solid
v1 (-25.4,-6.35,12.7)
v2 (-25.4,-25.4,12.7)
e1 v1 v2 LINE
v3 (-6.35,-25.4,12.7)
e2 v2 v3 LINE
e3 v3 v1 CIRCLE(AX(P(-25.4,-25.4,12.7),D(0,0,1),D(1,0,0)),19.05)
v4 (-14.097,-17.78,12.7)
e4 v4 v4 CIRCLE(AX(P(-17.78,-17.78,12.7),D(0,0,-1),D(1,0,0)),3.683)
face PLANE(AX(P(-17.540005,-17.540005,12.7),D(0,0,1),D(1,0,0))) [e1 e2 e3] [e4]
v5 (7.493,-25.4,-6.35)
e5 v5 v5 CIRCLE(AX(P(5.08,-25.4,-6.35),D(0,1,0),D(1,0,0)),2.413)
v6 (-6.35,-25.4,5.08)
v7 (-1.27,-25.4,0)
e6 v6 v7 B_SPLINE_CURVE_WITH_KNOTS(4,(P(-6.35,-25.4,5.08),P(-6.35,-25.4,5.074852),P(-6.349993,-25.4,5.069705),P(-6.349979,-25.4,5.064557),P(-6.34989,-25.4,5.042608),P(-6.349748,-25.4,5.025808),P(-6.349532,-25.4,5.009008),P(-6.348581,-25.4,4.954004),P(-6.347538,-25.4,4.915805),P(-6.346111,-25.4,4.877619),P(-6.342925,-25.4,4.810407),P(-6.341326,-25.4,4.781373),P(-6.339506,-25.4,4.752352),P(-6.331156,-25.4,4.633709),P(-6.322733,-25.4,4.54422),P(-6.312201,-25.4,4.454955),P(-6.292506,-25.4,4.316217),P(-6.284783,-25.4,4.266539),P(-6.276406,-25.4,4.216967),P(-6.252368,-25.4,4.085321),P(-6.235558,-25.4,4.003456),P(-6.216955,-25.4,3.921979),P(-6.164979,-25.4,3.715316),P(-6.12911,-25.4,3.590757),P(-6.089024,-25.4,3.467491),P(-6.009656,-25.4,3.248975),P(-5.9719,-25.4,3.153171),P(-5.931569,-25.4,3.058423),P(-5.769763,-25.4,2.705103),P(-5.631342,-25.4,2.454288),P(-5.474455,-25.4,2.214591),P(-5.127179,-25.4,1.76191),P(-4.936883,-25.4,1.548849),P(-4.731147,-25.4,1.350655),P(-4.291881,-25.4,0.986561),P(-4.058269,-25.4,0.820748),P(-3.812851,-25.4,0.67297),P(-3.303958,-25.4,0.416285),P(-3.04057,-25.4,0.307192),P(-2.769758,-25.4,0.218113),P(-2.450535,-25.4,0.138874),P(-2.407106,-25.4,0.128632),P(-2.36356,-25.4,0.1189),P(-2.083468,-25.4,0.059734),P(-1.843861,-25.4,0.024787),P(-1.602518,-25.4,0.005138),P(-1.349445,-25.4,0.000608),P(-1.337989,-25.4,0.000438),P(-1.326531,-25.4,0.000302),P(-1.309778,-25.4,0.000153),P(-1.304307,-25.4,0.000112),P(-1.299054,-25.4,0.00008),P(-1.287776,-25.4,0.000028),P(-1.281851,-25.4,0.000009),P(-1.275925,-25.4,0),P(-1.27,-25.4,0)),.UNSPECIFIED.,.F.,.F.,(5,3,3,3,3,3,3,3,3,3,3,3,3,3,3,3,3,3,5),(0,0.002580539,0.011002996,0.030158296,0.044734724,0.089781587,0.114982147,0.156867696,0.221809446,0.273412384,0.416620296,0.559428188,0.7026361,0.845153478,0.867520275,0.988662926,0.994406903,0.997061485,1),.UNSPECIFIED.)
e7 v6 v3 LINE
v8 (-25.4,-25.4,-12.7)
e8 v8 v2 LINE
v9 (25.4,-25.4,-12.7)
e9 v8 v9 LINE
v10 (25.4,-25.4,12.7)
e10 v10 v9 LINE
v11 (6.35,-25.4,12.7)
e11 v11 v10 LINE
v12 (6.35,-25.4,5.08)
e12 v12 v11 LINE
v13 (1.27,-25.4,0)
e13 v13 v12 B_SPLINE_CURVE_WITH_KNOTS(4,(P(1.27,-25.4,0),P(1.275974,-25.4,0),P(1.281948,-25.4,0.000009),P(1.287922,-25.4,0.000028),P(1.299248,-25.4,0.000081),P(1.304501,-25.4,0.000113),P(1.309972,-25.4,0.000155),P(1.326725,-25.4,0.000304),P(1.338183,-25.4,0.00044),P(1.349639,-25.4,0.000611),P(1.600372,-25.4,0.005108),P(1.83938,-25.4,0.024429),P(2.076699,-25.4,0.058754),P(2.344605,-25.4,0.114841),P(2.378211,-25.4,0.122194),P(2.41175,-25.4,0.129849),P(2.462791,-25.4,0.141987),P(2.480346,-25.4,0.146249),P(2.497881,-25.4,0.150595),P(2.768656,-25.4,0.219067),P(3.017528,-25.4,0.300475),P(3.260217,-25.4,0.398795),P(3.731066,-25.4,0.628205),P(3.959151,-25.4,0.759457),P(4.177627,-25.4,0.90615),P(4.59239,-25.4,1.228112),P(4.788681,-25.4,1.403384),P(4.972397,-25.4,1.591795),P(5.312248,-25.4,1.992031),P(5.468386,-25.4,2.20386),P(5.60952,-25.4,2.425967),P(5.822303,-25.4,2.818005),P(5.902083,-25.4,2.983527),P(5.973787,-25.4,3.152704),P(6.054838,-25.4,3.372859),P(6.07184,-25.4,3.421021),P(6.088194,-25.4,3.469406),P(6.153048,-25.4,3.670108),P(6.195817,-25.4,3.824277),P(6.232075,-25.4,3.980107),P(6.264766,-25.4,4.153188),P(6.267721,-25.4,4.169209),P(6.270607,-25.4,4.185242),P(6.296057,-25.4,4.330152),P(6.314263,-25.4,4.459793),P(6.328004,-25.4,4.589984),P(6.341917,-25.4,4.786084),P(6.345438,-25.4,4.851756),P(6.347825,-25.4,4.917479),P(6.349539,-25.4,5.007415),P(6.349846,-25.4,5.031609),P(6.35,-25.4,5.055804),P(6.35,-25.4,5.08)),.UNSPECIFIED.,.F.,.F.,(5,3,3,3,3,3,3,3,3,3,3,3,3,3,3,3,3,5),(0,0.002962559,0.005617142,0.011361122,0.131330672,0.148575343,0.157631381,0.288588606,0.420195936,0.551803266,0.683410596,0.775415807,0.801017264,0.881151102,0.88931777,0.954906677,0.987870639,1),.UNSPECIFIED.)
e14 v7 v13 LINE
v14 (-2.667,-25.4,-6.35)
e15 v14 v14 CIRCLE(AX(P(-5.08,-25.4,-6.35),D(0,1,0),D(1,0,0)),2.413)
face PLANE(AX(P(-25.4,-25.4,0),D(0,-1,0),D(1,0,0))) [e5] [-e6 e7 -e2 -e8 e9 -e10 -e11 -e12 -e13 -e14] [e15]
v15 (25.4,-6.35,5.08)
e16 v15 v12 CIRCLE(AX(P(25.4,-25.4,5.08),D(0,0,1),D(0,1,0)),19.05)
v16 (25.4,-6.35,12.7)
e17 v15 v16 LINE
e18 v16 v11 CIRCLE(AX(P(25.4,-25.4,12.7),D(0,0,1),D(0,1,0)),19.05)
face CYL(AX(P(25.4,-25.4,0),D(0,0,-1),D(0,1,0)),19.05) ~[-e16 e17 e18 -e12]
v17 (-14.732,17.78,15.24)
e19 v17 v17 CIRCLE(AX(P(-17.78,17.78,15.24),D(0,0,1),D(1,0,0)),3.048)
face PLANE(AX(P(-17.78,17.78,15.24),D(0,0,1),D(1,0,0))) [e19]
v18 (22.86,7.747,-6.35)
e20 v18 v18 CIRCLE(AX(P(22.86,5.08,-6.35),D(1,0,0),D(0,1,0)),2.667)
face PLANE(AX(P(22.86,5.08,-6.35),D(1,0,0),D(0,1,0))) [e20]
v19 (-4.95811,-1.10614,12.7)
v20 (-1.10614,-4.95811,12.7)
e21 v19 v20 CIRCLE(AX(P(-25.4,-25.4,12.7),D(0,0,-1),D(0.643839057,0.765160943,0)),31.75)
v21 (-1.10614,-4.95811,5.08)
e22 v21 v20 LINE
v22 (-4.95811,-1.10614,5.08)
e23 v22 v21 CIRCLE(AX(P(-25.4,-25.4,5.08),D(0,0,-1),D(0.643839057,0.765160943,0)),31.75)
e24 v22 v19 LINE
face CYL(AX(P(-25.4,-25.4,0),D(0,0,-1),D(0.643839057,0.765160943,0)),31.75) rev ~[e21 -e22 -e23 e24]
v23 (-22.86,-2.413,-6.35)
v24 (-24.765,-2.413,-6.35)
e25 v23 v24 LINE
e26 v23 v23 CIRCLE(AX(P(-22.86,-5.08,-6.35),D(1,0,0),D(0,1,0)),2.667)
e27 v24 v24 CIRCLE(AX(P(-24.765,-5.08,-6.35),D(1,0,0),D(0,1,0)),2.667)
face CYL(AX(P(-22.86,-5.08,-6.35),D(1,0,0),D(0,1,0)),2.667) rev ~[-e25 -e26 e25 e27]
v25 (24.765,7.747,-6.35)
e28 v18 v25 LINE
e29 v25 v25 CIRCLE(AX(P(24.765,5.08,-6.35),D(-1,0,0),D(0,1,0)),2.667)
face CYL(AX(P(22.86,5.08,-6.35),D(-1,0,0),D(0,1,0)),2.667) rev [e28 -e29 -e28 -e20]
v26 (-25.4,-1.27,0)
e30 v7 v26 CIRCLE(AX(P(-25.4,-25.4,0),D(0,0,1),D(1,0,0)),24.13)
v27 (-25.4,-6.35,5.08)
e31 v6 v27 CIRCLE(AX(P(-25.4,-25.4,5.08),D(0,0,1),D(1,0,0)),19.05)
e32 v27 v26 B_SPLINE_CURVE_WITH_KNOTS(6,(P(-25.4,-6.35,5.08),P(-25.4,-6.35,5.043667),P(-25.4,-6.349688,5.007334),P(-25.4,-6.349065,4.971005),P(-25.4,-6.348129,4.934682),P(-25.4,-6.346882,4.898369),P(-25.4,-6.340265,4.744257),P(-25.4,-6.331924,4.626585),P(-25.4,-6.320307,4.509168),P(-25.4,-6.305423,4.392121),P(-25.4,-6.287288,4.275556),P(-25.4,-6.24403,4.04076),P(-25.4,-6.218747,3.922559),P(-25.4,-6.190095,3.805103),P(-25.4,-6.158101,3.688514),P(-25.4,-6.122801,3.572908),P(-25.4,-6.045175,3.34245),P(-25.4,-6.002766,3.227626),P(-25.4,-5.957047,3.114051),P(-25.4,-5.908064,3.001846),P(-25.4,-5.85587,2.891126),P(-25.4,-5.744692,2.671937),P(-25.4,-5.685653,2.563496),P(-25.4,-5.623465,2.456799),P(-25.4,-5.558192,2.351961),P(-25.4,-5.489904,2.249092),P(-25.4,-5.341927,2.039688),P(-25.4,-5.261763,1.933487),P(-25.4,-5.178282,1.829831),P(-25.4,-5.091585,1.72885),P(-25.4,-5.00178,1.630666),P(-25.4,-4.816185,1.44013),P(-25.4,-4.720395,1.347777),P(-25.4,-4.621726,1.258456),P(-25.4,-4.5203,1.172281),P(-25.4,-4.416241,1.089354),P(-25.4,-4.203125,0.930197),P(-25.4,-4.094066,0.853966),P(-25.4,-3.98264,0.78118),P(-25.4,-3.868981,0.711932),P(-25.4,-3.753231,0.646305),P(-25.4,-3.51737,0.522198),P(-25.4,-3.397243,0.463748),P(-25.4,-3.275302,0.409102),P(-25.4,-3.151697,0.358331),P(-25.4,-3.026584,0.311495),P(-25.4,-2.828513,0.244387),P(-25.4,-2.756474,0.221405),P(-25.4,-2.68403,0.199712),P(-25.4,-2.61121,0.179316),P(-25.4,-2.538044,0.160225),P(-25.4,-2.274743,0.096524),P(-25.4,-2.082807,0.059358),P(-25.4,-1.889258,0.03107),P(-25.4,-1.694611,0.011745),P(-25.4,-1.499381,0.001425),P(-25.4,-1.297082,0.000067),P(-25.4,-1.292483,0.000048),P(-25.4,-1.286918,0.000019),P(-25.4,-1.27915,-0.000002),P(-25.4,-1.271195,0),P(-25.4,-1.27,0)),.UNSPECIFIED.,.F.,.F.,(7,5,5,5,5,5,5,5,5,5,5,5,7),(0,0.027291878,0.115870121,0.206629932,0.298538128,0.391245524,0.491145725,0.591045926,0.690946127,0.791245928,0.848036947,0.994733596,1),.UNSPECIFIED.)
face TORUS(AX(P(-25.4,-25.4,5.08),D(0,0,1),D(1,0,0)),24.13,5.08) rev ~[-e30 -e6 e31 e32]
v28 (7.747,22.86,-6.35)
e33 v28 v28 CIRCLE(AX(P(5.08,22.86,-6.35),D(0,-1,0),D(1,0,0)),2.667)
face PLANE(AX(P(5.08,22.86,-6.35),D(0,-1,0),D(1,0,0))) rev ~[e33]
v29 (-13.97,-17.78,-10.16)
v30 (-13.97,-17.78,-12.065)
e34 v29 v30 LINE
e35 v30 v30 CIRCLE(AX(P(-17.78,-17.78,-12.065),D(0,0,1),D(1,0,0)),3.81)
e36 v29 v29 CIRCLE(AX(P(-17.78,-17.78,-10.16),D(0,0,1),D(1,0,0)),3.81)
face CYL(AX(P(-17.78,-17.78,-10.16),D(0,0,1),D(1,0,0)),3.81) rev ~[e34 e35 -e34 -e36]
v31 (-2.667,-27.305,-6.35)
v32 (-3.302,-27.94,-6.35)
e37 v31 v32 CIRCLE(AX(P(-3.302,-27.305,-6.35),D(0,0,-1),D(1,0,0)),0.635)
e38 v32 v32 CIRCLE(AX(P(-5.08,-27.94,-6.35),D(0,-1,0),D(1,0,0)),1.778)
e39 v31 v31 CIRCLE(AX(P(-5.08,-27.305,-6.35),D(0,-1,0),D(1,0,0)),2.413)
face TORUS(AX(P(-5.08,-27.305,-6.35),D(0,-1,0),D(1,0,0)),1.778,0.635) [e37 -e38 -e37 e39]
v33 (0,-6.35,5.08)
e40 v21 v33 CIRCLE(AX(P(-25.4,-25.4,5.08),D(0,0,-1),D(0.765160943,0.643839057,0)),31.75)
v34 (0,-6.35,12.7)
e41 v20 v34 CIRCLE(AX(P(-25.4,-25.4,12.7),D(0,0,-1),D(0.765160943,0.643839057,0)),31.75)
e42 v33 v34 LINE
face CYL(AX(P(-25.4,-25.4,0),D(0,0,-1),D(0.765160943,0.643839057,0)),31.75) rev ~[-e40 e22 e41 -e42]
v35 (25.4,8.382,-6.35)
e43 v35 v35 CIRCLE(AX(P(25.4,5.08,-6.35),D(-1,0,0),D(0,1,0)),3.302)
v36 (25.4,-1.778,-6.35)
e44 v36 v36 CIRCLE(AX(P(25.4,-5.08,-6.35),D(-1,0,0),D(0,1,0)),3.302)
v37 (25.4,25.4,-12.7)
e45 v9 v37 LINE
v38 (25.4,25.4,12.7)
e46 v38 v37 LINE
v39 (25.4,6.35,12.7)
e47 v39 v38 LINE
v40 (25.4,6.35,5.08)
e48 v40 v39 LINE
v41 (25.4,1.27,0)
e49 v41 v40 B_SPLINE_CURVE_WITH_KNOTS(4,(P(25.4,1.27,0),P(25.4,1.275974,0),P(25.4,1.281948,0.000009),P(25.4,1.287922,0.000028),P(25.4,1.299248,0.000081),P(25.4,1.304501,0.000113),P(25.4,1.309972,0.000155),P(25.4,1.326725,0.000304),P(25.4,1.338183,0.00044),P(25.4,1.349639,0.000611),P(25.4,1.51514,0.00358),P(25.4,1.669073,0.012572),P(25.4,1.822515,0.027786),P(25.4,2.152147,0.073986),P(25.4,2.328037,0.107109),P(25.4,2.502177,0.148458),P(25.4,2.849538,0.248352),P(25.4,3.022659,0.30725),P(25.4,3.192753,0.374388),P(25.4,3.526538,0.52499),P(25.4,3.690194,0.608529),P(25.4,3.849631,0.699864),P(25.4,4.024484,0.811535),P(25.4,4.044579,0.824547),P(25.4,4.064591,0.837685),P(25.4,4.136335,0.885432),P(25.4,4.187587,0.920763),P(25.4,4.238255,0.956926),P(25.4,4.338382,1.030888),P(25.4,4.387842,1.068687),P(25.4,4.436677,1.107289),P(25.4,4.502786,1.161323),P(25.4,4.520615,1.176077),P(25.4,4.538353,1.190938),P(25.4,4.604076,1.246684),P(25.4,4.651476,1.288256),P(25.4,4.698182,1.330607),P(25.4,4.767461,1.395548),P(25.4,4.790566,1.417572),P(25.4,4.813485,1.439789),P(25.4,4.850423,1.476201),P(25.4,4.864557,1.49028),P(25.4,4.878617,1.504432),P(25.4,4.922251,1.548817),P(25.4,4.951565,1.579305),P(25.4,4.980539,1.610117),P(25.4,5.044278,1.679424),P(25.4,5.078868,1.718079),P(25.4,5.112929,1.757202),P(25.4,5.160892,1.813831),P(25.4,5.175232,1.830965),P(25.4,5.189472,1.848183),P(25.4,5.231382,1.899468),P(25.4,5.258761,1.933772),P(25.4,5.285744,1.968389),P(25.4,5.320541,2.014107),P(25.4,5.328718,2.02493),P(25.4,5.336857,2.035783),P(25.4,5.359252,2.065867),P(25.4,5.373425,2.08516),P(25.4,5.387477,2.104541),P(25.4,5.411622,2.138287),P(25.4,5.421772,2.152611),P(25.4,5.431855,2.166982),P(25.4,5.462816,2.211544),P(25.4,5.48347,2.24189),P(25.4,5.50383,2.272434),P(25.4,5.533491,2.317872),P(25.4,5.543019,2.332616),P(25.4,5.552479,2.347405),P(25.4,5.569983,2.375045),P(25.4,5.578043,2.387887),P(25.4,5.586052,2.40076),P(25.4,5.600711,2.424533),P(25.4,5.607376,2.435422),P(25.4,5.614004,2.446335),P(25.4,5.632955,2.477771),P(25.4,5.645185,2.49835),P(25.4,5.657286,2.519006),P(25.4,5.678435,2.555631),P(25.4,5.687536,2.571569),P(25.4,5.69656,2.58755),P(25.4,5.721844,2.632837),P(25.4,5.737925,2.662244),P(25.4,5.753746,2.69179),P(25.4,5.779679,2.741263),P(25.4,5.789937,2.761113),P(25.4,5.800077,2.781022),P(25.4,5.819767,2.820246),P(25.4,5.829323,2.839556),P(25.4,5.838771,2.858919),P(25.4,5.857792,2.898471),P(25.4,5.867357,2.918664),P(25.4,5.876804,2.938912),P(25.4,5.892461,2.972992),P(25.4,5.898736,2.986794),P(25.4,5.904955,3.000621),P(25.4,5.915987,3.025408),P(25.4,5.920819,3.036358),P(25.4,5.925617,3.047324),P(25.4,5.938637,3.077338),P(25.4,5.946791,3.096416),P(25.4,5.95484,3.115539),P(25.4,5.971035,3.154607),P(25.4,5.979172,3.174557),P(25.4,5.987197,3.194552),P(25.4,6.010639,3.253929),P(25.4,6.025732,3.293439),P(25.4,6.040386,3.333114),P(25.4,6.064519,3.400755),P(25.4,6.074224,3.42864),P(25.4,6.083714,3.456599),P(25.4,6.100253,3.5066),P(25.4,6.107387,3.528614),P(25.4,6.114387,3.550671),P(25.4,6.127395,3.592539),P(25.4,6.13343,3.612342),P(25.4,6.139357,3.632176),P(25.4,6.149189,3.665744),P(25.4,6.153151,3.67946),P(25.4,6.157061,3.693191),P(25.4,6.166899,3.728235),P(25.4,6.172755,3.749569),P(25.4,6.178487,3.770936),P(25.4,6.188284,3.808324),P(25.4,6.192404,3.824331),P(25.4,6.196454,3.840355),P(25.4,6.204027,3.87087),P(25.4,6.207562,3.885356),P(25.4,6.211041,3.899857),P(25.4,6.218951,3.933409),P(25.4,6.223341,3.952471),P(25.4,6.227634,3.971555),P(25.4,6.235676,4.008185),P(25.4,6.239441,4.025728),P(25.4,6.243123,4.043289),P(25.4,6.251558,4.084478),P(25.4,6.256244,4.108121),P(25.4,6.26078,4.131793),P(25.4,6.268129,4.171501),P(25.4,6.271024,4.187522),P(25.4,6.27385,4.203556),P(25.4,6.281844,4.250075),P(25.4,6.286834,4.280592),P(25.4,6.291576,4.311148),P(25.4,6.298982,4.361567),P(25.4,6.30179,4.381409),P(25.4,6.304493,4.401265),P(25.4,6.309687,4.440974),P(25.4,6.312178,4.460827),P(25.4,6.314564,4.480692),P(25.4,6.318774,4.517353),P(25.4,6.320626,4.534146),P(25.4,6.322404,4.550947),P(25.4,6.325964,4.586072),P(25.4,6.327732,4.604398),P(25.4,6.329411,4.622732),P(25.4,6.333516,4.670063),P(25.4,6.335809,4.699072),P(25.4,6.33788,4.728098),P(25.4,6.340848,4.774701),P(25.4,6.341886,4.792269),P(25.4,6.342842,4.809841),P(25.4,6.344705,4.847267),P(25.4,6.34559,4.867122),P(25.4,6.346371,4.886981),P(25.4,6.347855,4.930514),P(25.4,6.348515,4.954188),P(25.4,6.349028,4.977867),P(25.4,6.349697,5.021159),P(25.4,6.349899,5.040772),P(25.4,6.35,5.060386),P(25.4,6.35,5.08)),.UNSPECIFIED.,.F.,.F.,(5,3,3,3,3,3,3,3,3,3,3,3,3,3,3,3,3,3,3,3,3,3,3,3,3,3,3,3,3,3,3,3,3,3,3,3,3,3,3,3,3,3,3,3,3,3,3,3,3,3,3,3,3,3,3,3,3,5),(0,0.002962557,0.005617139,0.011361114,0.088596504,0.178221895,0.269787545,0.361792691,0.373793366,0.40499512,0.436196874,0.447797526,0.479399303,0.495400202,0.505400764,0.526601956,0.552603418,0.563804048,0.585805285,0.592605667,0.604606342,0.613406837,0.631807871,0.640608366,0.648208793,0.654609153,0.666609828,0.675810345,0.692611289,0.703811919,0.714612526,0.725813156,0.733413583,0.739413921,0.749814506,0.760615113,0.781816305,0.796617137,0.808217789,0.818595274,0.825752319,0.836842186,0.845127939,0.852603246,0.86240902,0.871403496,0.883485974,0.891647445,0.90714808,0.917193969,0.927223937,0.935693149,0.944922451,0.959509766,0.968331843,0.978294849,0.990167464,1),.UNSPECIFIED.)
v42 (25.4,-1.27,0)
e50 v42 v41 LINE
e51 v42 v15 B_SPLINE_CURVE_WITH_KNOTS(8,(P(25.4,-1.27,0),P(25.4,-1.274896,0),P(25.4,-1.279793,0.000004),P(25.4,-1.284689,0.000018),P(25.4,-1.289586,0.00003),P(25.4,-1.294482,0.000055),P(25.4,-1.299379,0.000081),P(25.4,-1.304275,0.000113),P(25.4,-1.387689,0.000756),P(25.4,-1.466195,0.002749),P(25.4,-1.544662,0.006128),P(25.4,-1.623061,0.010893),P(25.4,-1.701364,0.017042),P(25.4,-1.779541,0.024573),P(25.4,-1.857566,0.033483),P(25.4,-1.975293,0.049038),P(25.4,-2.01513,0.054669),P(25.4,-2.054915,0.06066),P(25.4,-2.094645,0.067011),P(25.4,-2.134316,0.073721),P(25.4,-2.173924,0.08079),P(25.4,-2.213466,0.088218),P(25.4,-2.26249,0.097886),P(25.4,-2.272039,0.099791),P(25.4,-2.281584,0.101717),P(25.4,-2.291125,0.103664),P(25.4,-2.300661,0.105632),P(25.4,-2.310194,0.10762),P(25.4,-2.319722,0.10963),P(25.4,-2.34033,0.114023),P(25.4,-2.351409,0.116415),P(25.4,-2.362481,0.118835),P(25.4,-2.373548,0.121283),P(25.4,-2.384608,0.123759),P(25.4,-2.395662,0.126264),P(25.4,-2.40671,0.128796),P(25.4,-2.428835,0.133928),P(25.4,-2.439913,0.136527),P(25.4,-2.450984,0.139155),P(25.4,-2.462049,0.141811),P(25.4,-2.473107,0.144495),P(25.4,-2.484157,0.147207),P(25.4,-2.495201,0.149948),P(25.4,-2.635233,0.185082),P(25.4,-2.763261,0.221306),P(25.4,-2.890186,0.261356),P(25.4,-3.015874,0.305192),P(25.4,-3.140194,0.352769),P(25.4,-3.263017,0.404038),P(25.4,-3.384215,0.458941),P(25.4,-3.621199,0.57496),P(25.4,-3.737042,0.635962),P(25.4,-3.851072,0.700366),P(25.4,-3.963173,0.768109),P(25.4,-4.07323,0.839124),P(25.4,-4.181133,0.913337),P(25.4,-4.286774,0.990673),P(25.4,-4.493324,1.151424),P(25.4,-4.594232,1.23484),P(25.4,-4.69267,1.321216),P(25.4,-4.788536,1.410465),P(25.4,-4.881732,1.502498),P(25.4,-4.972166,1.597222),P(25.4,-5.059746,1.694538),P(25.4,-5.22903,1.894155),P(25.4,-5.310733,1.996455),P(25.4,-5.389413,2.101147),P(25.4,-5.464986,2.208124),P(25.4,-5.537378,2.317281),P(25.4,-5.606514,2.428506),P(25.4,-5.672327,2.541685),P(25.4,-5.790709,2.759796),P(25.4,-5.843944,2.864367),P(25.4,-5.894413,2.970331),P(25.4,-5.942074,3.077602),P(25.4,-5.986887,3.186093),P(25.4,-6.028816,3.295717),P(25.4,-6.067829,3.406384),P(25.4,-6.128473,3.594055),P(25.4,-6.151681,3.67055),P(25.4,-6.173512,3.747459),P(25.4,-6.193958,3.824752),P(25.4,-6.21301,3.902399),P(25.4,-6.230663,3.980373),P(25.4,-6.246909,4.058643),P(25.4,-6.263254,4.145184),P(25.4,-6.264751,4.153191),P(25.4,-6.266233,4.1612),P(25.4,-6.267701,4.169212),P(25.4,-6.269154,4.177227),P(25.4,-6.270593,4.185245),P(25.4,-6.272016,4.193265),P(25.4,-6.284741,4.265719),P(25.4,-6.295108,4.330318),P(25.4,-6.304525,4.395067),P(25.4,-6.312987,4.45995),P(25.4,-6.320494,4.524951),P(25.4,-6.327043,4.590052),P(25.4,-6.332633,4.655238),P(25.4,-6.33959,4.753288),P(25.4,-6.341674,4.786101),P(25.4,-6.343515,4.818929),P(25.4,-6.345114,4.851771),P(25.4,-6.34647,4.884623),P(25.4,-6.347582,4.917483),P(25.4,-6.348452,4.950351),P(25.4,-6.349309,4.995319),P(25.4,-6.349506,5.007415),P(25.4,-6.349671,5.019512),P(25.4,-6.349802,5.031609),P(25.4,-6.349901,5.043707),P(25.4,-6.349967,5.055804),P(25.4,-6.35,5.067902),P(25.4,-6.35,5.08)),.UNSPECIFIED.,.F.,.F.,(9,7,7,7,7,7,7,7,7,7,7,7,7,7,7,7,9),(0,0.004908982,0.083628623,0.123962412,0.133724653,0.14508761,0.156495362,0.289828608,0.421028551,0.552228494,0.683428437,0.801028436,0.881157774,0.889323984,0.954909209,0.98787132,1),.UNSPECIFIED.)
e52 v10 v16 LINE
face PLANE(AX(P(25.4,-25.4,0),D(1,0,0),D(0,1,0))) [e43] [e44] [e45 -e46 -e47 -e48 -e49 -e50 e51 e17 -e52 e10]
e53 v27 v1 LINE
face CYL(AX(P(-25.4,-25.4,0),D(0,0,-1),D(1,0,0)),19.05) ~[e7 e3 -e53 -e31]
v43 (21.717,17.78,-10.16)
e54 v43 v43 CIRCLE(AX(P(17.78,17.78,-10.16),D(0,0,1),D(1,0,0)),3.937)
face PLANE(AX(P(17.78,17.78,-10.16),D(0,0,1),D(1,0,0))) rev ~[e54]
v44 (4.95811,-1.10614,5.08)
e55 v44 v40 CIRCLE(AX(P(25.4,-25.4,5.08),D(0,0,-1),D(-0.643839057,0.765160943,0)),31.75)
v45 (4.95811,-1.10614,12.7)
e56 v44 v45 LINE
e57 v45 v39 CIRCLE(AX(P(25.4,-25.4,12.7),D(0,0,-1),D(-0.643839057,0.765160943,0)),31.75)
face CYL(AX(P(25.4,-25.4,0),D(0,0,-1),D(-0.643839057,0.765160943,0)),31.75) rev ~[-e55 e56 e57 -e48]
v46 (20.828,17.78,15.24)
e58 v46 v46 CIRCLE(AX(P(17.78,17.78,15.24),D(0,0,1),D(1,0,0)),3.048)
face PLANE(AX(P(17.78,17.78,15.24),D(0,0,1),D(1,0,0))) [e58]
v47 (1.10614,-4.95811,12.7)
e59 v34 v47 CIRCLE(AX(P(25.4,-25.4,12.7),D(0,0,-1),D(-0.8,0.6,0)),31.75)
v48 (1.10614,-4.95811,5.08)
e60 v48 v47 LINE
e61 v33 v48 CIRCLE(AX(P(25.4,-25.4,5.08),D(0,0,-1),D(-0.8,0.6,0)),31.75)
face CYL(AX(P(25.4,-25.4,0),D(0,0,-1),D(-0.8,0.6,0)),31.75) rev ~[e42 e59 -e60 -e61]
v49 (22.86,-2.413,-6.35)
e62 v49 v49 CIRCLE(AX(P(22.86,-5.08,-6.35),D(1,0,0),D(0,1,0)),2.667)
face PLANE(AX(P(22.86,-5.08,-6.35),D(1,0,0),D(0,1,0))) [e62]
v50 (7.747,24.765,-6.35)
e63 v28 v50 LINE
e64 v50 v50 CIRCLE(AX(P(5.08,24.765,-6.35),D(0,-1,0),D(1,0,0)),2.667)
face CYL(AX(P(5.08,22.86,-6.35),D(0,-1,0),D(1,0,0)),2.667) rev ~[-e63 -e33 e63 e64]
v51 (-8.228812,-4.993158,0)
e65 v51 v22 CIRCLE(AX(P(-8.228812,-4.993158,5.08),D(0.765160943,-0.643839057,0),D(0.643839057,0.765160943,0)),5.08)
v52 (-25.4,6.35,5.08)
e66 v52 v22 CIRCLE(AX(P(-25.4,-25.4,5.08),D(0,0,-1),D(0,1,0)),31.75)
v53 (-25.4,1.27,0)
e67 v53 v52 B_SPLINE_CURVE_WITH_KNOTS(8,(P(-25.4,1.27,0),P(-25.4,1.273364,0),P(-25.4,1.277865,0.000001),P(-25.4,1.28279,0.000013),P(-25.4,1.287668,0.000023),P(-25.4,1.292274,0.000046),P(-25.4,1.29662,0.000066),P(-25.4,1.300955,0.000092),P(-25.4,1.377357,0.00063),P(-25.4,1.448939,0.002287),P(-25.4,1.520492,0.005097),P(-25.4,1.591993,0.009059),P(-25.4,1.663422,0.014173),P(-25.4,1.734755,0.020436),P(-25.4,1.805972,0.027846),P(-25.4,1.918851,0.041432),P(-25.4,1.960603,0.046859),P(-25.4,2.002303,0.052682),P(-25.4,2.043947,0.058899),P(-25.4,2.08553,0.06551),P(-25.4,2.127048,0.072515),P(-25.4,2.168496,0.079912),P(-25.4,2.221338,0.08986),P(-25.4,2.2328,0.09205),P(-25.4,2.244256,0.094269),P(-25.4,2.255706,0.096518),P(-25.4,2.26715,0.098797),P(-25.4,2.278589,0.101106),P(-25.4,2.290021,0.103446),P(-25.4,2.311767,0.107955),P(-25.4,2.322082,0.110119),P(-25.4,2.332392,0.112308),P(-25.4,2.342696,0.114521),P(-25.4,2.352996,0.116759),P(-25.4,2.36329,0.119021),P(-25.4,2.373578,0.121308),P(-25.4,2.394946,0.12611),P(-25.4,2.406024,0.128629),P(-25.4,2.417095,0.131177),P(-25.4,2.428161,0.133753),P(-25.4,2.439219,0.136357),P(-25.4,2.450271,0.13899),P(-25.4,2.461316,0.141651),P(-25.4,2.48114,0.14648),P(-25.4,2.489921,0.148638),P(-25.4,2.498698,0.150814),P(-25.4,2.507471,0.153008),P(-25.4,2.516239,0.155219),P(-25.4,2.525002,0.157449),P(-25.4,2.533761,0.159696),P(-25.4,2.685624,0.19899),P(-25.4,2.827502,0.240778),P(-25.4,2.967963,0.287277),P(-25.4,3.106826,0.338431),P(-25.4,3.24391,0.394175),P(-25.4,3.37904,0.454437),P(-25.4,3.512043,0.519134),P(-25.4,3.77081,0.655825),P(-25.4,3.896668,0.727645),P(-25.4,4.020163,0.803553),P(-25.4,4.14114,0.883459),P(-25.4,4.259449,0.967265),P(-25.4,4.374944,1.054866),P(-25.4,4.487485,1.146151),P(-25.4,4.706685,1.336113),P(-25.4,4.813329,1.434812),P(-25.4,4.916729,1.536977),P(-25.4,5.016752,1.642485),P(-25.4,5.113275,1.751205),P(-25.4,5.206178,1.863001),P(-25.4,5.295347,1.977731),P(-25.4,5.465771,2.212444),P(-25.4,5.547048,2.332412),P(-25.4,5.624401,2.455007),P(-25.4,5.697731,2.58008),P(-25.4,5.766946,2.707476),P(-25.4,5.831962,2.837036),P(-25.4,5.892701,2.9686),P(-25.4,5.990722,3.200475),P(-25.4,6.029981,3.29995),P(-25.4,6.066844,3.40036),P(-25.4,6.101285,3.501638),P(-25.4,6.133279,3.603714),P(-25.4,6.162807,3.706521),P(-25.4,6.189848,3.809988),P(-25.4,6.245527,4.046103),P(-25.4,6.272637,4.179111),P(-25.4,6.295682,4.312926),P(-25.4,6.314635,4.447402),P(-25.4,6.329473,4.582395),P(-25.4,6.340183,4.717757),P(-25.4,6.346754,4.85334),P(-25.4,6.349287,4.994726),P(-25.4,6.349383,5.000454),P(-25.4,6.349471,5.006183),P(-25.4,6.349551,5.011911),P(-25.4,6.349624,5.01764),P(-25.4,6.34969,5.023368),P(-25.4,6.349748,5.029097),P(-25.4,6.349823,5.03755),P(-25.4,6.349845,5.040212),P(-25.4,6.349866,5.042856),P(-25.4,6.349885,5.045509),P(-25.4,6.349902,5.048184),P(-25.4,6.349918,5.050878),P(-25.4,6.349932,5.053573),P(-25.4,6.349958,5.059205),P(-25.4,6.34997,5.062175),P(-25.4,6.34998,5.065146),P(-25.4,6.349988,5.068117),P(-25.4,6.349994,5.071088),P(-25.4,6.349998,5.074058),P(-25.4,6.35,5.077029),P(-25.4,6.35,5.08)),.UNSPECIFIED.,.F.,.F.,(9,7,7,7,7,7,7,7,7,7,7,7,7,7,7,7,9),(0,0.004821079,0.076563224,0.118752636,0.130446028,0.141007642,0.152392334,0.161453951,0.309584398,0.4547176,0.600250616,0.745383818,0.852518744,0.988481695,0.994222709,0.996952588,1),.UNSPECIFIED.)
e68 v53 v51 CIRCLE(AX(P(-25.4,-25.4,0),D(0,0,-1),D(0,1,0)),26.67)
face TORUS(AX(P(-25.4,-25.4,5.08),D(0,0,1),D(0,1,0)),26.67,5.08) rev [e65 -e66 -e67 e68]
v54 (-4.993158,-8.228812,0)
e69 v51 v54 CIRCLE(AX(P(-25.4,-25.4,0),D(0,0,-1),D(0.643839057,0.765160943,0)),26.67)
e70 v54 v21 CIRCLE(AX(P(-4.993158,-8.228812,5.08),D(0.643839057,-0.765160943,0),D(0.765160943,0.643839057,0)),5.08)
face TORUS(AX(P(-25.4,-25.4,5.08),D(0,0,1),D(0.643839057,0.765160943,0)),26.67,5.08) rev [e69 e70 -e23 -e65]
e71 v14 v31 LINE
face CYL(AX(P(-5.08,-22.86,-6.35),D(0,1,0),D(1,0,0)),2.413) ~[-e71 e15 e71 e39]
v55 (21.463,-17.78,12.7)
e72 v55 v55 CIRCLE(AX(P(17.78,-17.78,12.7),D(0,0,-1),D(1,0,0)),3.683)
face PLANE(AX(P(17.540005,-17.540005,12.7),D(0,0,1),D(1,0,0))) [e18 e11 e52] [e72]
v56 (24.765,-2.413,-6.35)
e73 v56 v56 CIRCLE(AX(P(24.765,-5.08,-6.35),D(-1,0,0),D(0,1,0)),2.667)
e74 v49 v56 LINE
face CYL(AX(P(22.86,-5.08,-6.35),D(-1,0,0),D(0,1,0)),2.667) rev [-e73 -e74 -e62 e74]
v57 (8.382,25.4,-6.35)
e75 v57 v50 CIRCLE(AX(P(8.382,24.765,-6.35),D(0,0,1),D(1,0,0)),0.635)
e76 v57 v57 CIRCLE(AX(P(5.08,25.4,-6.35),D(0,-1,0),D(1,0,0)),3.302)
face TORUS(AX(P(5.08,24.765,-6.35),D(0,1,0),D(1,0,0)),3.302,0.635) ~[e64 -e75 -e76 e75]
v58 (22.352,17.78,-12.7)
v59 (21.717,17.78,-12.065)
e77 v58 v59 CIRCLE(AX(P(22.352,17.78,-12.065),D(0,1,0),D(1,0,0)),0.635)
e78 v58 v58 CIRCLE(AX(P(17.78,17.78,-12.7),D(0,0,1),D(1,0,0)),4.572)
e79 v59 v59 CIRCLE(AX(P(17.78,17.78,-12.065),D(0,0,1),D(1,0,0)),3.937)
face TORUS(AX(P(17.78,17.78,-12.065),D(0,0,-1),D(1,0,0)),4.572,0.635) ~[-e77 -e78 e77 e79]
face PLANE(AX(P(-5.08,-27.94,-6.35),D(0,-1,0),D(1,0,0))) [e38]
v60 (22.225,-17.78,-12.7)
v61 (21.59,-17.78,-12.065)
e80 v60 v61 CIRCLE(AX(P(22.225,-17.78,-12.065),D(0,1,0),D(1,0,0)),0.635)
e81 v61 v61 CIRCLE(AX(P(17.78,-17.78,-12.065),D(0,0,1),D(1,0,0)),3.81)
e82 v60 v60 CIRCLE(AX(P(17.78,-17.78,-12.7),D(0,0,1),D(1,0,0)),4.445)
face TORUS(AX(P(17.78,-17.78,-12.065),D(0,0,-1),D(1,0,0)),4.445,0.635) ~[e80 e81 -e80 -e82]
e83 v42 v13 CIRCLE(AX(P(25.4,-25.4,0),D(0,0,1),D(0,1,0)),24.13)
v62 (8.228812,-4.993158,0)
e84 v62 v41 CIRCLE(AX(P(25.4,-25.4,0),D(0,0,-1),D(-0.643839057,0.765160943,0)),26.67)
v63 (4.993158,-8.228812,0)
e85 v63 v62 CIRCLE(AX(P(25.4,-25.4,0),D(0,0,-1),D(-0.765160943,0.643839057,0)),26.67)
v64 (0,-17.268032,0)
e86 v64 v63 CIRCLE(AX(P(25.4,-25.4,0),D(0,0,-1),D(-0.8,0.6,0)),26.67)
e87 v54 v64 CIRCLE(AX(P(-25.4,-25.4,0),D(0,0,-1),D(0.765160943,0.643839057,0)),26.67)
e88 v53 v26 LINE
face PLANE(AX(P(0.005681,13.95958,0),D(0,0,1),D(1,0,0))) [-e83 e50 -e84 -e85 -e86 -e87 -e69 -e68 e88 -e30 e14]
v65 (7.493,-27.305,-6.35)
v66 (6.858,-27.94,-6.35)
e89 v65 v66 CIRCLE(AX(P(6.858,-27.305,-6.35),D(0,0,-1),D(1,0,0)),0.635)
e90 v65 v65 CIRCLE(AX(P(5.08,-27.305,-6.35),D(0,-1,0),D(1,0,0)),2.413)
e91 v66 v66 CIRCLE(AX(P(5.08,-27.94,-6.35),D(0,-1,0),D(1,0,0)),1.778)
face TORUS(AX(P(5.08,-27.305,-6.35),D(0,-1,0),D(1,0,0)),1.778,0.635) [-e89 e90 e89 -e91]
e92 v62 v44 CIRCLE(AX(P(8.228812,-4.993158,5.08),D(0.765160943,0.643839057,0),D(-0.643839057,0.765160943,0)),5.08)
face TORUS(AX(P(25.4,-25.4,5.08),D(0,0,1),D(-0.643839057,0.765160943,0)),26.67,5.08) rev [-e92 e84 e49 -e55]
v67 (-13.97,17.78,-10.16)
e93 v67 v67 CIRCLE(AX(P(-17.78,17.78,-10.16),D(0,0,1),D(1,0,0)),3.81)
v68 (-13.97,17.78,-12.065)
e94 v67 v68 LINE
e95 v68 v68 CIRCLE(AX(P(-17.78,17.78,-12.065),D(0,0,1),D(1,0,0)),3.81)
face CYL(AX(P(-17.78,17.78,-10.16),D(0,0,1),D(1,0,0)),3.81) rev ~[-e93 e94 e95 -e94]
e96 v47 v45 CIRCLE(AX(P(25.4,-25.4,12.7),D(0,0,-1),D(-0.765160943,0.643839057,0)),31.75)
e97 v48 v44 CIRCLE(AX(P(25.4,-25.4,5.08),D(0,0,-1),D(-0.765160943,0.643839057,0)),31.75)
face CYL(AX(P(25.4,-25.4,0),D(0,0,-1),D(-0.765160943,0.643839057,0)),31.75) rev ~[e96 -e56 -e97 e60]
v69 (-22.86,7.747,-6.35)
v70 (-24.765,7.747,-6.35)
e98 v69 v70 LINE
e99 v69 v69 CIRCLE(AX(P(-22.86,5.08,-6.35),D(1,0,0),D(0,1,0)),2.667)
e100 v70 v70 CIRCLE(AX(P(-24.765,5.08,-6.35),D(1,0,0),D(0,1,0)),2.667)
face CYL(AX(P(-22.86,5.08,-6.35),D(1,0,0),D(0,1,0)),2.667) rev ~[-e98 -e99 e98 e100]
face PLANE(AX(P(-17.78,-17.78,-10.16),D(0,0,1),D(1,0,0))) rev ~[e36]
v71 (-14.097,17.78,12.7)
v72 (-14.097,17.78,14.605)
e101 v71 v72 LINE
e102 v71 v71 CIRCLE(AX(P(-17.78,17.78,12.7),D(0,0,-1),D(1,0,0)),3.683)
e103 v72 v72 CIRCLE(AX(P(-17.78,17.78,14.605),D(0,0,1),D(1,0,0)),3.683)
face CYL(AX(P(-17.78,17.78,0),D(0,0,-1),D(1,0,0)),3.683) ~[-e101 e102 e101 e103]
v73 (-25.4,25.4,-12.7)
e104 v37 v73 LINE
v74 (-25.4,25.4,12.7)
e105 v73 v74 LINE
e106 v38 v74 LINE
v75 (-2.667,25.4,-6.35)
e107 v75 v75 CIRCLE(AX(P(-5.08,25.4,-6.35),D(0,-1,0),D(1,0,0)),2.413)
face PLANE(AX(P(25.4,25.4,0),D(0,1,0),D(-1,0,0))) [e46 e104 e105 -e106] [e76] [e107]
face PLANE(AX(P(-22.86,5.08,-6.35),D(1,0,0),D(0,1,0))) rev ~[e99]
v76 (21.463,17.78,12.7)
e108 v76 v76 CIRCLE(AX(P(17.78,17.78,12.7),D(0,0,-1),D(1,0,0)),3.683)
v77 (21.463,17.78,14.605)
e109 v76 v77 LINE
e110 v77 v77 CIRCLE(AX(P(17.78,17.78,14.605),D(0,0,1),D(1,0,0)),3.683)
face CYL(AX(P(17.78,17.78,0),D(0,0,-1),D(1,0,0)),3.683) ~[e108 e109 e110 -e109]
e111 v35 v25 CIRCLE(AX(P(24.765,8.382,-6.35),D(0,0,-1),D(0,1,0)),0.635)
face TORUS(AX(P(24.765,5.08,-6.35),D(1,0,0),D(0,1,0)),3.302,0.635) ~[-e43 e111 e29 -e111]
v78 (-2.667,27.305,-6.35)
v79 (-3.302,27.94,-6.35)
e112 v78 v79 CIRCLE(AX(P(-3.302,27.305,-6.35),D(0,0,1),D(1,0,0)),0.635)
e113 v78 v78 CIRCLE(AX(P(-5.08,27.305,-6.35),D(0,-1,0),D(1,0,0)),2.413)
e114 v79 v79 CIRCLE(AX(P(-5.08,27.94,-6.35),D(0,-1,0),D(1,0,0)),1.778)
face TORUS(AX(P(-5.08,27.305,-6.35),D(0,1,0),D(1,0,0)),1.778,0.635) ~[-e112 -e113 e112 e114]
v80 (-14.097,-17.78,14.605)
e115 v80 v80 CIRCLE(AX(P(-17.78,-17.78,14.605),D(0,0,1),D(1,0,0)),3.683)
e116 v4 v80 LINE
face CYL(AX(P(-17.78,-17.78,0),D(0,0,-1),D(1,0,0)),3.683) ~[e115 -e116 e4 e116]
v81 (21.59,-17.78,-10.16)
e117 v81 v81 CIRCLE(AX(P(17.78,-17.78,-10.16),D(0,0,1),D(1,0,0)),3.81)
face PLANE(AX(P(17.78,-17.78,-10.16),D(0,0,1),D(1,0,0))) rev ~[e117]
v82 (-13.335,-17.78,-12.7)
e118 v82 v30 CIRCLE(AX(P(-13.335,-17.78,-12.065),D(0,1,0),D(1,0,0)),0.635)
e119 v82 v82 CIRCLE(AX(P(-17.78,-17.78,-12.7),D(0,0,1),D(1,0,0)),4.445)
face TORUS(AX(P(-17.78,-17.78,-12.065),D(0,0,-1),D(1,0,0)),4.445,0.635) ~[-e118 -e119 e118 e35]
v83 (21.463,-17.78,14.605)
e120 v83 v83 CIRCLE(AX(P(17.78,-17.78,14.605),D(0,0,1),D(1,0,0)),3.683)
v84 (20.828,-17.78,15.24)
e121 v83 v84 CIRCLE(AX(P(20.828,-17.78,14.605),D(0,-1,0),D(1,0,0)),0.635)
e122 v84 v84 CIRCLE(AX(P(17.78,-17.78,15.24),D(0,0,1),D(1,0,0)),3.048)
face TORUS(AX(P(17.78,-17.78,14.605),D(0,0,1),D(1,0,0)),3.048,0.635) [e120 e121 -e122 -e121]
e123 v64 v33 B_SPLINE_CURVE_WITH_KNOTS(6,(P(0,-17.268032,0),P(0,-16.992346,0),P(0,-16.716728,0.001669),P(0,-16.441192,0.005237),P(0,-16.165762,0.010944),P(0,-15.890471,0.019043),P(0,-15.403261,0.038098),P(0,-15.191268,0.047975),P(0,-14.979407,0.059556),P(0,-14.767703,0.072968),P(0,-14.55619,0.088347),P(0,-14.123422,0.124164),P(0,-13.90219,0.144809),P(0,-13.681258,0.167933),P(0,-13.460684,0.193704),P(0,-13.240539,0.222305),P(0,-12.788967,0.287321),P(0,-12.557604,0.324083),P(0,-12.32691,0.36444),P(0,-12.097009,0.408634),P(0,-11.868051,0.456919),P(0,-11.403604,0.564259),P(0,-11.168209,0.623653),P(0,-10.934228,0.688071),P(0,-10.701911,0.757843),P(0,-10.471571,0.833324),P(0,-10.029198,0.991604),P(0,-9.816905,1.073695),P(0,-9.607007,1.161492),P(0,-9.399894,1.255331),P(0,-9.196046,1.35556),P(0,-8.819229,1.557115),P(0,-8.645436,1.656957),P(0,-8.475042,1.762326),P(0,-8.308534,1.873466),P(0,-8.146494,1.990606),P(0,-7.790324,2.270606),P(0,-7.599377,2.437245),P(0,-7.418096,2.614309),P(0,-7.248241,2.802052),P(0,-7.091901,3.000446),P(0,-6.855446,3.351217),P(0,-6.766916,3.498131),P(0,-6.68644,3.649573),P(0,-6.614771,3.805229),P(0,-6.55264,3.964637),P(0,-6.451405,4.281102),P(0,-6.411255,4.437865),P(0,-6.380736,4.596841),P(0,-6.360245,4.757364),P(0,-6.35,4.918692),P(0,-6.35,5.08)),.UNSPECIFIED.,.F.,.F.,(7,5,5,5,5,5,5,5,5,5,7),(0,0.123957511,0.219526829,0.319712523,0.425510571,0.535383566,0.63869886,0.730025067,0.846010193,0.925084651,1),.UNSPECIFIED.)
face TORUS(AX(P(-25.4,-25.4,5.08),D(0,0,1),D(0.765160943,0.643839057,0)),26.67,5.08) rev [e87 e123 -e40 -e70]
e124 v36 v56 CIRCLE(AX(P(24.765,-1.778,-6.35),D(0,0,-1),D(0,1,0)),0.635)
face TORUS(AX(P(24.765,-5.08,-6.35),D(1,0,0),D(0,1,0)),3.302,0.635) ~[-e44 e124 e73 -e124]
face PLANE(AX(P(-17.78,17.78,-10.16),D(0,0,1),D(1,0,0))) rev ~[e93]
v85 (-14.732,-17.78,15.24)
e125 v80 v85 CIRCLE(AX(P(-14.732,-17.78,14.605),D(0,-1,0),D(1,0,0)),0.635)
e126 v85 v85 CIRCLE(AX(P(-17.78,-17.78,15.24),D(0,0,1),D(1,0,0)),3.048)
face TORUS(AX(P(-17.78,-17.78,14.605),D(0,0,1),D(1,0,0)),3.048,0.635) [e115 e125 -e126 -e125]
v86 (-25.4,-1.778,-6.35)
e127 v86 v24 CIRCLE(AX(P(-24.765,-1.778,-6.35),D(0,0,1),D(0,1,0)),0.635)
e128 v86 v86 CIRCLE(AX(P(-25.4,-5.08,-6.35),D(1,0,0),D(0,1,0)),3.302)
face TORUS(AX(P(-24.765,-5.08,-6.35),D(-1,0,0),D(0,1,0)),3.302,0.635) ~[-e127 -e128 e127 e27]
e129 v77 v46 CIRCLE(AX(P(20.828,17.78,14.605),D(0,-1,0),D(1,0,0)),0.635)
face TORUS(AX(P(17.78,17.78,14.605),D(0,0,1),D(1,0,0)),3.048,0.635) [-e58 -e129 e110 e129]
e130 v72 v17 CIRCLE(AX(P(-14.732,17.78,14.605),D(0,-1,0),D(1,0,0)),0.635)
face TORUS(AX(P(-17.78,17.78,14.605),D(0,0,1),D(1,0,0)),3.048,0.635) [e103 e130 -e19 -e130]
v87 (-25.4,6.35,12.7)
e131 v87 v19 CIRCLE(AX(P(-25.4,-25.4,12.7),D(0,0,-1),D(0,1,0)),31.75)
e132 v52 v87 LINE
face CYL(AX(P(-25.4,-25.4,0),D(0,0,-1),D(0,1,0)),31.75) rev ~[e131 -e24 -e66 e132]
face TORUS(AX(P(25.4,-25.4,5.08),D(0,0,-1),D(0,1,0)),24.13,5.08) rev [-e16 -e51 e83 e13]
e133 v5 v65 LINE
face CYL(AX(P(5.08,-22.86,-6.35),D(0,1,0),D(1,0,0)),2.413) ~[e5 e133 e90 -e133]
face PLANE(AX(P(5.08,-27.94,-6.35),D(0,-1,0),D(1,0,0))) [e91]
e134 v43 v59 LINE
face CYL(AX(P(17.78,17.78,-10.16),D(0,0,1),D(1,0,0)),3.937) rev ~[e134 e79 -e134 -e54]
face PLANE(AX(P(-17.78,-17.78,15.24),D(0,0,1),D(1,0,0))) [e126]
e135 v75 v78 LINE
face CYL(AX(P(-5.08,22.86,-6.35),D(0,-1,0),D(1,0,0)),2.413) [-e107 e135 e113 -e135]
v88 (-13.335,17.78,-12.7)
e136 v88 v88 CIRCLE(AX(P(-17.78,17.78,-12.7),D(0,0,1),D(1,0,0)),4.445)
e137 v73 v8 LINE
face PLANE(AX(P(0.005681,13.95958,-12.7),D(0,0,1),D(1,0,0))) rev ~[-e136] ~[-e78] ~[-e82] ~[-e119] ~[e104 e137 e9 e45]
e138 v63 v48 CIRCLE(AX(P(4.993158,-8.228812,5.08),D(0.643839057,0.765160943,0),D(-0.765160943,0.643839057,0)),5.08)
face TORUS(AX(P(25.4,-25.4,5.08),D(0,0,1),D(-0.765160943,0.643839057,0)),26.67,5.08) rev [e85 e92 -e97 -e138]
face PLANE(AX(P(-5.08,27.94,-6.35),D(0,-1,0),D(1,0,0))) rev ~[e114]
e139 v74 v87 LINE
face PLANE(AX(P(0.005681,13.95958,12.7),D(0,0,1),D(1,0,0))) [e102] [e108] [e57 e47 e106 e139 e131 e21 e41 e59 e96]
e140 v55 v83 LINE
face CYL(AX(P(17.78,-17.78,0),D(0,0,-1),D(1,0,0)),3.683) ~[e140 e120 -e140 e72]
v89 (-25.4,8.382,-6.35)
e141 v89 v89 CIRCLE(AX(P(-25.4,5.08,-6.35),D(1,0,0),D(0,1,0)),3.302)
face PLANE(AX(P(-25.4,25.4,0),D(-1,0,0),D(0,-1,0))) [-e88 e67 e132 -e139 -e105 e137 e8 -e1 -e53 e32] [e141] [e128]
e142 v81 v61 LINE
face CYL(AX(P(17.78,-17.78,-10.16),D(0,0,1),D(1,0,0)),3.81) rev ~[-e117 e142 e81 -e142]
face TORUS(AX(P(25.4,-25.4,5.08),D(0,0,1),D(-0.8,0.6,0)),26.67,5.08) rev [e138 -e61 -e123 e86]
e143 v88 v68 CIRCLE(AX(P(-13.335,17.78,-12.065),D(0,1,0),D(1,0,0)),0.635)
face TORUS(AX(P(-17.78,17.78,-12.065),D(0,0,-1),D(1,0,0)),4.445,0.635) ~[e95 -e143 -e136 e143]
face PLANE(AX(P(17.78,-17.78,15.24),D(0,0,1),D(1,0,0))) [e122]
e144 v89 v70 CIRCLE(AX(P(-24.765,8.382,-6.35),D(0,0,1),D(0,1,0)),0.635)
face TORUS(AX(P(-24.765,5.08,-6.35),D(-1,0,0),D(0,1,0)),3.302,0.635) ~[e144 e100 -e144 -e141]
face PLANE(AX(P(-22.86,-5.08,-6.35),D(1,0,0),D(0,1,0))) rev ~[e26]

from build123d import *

# Parameters (mm, degrees)
F0_R      = 3.81
F0_R_2    = 3.937
F0_R_3    = 2.667
F0_R_4    = 3.683
F0_R_5    = 2.413
F1_DEPTH  = 12.7
F2_DEPTH  = 15.24
F3_DEPTH  = 12.7
F4_START  = -10.16
F4_DEPTH  = 2.54
F7_START  = -22.86
F6_R      = 2.413
F7_DEPTH  = 5.08
F8_START  = 22.86
F8_DEPTH  = 5.08
F9_START  = 22.86
F5_R      = 2.667
F5_R_2    = 2.413
F9_DEPTH  = 5.08
F10_START = -22.86
F10_DEPTH = 5.08
F11_START = -22.86
F6_R_2    = 2.667
F11_DEPTH = 5.08
F12_R     = 5.08
F13_R     = 0.635


# Not quite as in the source:
# - a feature names something its author has since deleted; it is built from what else it names


with BuildPart() as f1:
    # F0 (on Top) → F1 (new body)
    with BuildSketch(Plane.XY):
        with BuildLine():
            Line((25.4, 17.78), (25.4, 25.4))
            Line((25.4, 25.4), (-25.4, 25.4))
            Line((-25.4, 25.4), (-25.4, 6.35))
            ThreePointArc((-25.4, 6.35), (-14.520375766, 4.427776929), (-4.9581099388, -1.1061400612))
            ThreePointArc((-4.9581099388, -1.1061400612), (-0.5564177886, 5.0494355372), (5.08, 0))
            ThreePointArc((5.08, 0), (5.0494355372, -0.5564177886), (4.9581099388, -1.1061400612))
            ThreePointArc((4.9581099388, -1.1061400612), (14.520375766, 4.427776929), (25.4, 6.35))
            Line((25.4, 6.35), (25.4, 17.78))
        make_face()
        with Locations((-17.78, 17.78)):
            Circle(F0_R, mode=Mode.SUBTRACT)
        with Locations((17.78, 17.78)):
            Circle(F0_R_2, mode=Mode.SUBTRACT)
        with BuildLine():
            ThreePointArc((5.08, 0), (-0.5564177886, 5.0494355372), (-4.9581099388, -1.1061400612))
            ThreePointArc((-4.9581099388, -1.1061400612), (-2.9493596973, -2.9493596973), (-1.1061400612, -4.9581099388))
            ThreePointArc((-1.1061400612, -4.9581099388), (0, -5.08), (1.1061400612, -4.9581099388))
            ThreePointArc((1.1061400612, -4.9581099388), (2.9493596973, -2.9493596973), (4.9581099388, -1.1061400612))
            ThreePointArc((4.9581099388, -1.1061400612), (5.0494355372, -0.5564177886), (5.08, 0))
        make_face()
        Circle(F0_R_3, mode=Mode.SUBTRACT)
        with Locations((17.78, 17.78)):
            Circle(F0_R_2)
        with Locations((17.78, 17.78)):
            Circle(F0_R_4, mode=Mode.SUBTRACT)
        with Locations((-17.78, 17.78)):
            Circle(F0_R)
        with Locations((-17.78, 17.78)):
            Circle(F0_R_4, mode=Mode.SUBTRACT)
        with Locations((-17.78, 17.78)):
            Circle(F0_R_4)
        with Locations((17.78, 17.78)):
            Circle(F0_R_4)
        Circle(F0_R_3)
        Circle(F0_R_5, mode=Mode.SUBTRACT)
        Circle(F0_R_5)
        with BuildLine():
            ThreePointArc((1.1061400612, -4.9581099388), (0, -5.08), (-1.1061400612, -4.9581099388))
            ThreePointArc((-1.1061400612, -4.9581099388), (-0.5433254761, -5.6463109367), (0, -6.35))
            ThreePointArc((0, -6.35), (0.5433254761, -5.6463109367), (1.1061400612, -4.9581099388))
        make_face()
    extrude(amount=F1_DEPTH)

    # F0 (on Top) → F2, piece 2 (join)
    with BuildSketch(Plane.XY):
        with Locations((-17.78, 17.78)):
            Circle(F0_R_4)
        with Locations((17.78, 17.78)):
            Circle(F0_R_4)
    extrude(amount=F2_DEPTH)



with BuildPart() as f1b:
    # F0 (on Top) → F1, piece 2 (new body)
    with BuildSketch(Plane.XY):
        with BuildLine():
            ThreePointArc((-6.35, -25.4), (-11.9296158184, -11.9296158184), (-25.4, -6.35))
            Line((-25.4, -6.35), (-25.4, -25.4))
            Line((-25.4, -25.4), (-6.35, -25.4))
        make_face()
        with Locations((-17.78, -17.78)):
            Circle(F0_R, mode=Mode.SUBTRACT)
        with Locations((-17.78, -17.78)):
            Circle(F0_R)
        with Locations((-17.78, -17.78)):
            Circle(F0_R_4, mode=Mode.SUBTRACT)
        with Locations((-17.78, -17.78)):
            Circle(F0_R_4)
    extrude(amount=F1_DEPTH)

    # F0 (on Top) → F2 (join)
    with BuildSketch(Plane.XY):
        with Locations((-17.78, -17.78)):
            Circle(F0_R_4)
    extrude(amount=F2_DEPTH)


with BuildPart() as f1c:
    # F0 (on Top) → F1, piece 3 (new body)
    with BuildSketch(Plane.XY):
        with BuildLine():
            Line((25.4, -25.4), (25.4, -6.35))
            ThreePointArc((25.4, -6.35), (11.9296158184, -11.9296158184), (6.35, -25.4))
            Line((6.35, -25.4), (25.4, -25.4))
        make_face()
        with Locations((17.78, -17.78)):
            Circle(F0_R, mode=Mode.SUBTRACT)
        with Locations((17.78, -17.78)):
            Circle(F0_R)
        with Locations((17.78, -17.78)):
            Circle(F0_R_4, mode=Mode.SUBTRACT)
        with Locations((17.78, -17.78)):
            Circle(F0_R_4)
    extrude(amount=F1_DEPTH)

    # F0 (on Top) → F2, piece 3 (join)
    with BuildSketch(Plane.XY):
        with Locations((17.78, -17.78)):
            Circle(F0_R_4)
    extrude(amount=F2_DEPTH)


with BuildPart() as f1_1:
    add(f1.part)

    add(f1b.part)  # F3 merges F1b

    add(f1c.part)  # F3 merges F1c
    # F0 (on Top) → F3 (join)
    with BuildSketch(Plane.XY):
        with BuildLine():
            Line((25.4, 17.78), (25.4, 25.4))
            Line((25.4, 25.4), (-25.4, 25.4))
            Line((-25.4, 25.4), (-25.4, 6.35))
            ThreePointArc((-25.4, 6.35), (-14.520375766, 4.427776929), (-4.9581099388, -1.1061400612))
            ThreePointArc((-4.9581099388, -1.1061400612), (-0.5564177886, 5.0494355372), (5.08, 0))
            ThreePointArc((5.08, 0), (5.0494355372, -0.5564177886), (4.9581099388, -1.1061400612))
            ThreePointArc((4.9581099388, -1.1061400612), (14.520375766, 4.427776929), (25.4, 6.35))
            Line((25.4, 6.35), (25.4, 17.78))
        make_face()
        with Locations((-17.78, 17.78)):
            Circle(F0_R, mode=Mode.SUBTRACT)
        with Locations((17.78, 17.78)):
            Circle(F0_R_2, mode=Mode.SUBTRACT)
        with BuildLine():
            ThreePointArc((-4.9581099388, -1.1061400612), (-14.520375766, 4.427776929), (-25.4, 6.35))
            Line((-25.4, 6.35), (-25.4, -6.35))
            ThreePointArc((-25.4, -6.35), (-11.9296158184, -11.9296158184), (-6.35, -25.4))
            Line((-6.35, -25.4), (6.35, -25.4))
            ThreePointArc((6.35, -25.4), (11.9296158184, -11.9296158184), (25.4, -6.35))
            Line((25.4, -6.35), (25.4, 6.35))
            ThreePointArc((25.4, 6.35), (14.520375766, 4.427776929), (4.9581099388, -1.1061400612))
            ThreePointArc((4.9581099388, -1.1061400612), (3.5921024484, -3.5921024484), (1.1061400612, -4.9581099388))
            ThreePointArc((1.1061400612, -4.9581099388), (0.5433254761, -5.6463109367), (0, -6.35))
            ThreePointArc((0, -6.35), (-0.5433254761, -5.6463109367), (-1.1061400612, -4.9581099388))
            ThreePointArc((-1.1061400612, -4.9581099388), (-3.5921024484, -3.5921024484), (-4.9581099388, -1.1061400612))
        make_face()
        with BuildLine():
            ThreePointArc((-6.35, -25.4), (-11.9296158184, -11.9296158184), (-25.4, -6.35))
            Line((-25.4, -6.35), (-25.4, -25.4))
            Line((-25.4, -25.4), (-6.35, -25.4))
        make_face()
        with Locations((-17.78, -17.78)):
            Circle(F0_R, mode=Mode.SUBTRACT)
        with BuildLine():
            Line((25.4, -25.4), (25.4, -6.35))
            ThreePointArc((25.4, -6.35), (11.9296158184, -11.9296158184), (6.35, -25.4))
            Line((6.35, -25.4), (25.4, -25.4))
        make_face()
        with Locations((17.78, -17.78)):
            Circle(F0_R, mode=Mode.SUBTRACT)
        with BuildLine():
            ThreePointArc((5.08, 0), (-0.5564177886, 5.0494355372), (-4.9581099388, -1.1061400612))
            ThreePointArc((-4.9581099388, -1.1061400612), (-2.9493596973, -2.9493596973), (-1.1061400612, -4.9581099388))
            ThreePointArc((-1.1061400612, -4.9581099388), (0, -5.08), (1.1061400612, -4.9581099388))
            ThreePointArc((1.1061400612, -4.9581099388), (2.9493596973, -2.9493596973), (4.9581099388, -1.1061400612))
            ThreePointArc((4.9581099388, -1.1061400612), (5.0494355372, -0.5564177886), (5.08, 0))
        make_face()
        Circle(F0_R_3, mode=Mode.SUBTRACT)
        with Locations((17.78, 17.78)):
            Circle(F0_R_2)
        with Locations((17.78, 17.78)):
            Circle(F0_R_4, mode=Mode.SUBTRACT)
        with Locations((17.78, -17.78)):
            Circle(F0_R)
        with Locations((17.78, -17.78)):
            Circle(F0_R_4, mode=Mode.SUBTRACT)
        with Locations((-17.78, -17.78)):
            Circle(F0_R)
        with Locations((-17.78, -17.78)):
            Circle(F0_R_4, mode=Mode.SUBTRACT)
        with Locations((-17.78, 17.78)):
            Circle(F0_R)
        with Locations((-17.78, 17.78)):
            Circle(F0_R_4, mode=Mode.SUBTRACT)
        with Locations((17.78, -17.78)):
            Circle(F0_R_4)
        with Locations((-17.78, -17.78)):
            Circle(F0_R_4)
        with Locations((-17.78, 17.78)):
            Circle(F0_R_4)
        with Locations((17.78, 17.78)):
            Circle(F0_R_4)
        Circle(F0_R_3)
        Circle(F0_R_5, mode=Mode.SUBTRACT)
        Circle(F0_R_5)
        with BuildLine():
            ThreePointArc((-1.1061400612, -4.9581099388), (-2.9493596973, -2.9493596973), (-4.9581099388, -1.1061400612))
            ThreePointArc((-4.9581099388, -1.1061400612), (-3.5921024484, -3.5921024484), (-1.1061400612, -4.9581099388))
        make_face()
        with BuildLine():
            ThreePointArc((1.1061400612, -4.9581099388), (3.5921024484, -3.5921024484), (4.9581099388, -1.1061400612))
            ThreePointArc((4.9581099388, -1.1061400612), (2.9493596973, -2.9493596973), (1.1061400612, -4.9581099388))
        make_face()
        with BuildLine():
            ThreePointArc((1.1061400612, -4.9581099388), (0, -5.08), (-1.1061400612, -4.9581099388))
            ThreePointArc((-1.1061400612, -4.9581099388), (-0.5433254761, -5.6463109367), (0, -6.35))
            ThreePointArc((0, -6.35), (0.5433254761, -5.6463109367), (1.1061400612, -4.9581099388))
        make_face()
    extrude(amount=-F3_DEPTH)

    # F0 (on Top) → F4 (cut)
    with BuildSketch(Plane.XY.offset(F4_START)):
        with Locations((17.78, 17.78)):
            Circle(F0_R_2)
        with Locations((17.78, 17.78)):
            Circle(F0_R_4, mode=Mode.SUBTRACT)
        with Locations((-17.78, -17.78)):
            Circle(F0_R)
        with Locations((-17.78, -17.78)):
            Circle(F0_R_4, mode=Mode.SUBTRACT)
        with Locations((17.78, -17.78)):
            Circle(F0_R)
        with Locations((17.78, -17.78)):
            Circle(F0_R_4, mode=Mode.SUBTRACT)
        with Locations((-17.78, 17.78)):
            Circle(F0_R)
        with Locations((-17.78, 17.78)):
            Circle(F0_R_4, mode=Mode.SUBTRACT)
        with Locations((17.78, -17.78)):
            Circle(F0_R_4)
        with Locations((-17.78, -17.78)):
            Circle(F0_R_4)
        with Locations((17.78, 17.78)):
            Circle(F0_R_4)
        with Locations((-17.78, 17.78)):
            Circle(F0_R_4)
    extrude(amount=-F4_DEPTH, mode=Mode.SUBTRACT)

    # F6 (on Front) → F7 (join)
    with BuildSketch(Plane.XZ.offset(F7_START)):
        with Locations((-5.08, -6.35)):
            Circle(F6_R)
    extrude(amount=-F7_DEPTH)

    # F6 (on Front) → F8 (join)
    with BuildSketch(Plane.XZ.offset(F8_START)):
        with Locations((-5.08, -6.35)):
            Circle(F6_R)
        with Locations((5.08, -6.35)):
            Circle(F6_R)
    extrude(amount=F8_DEPTH)

    # F5 (on Right) → F9 (cut)
    with BuildSketch(Plane.YZ.offset(F9_START)):
        with Locations((-5.08, -6.35)):
            Circle(F5_R)
        with Locations((-5.08, -6.35)):
            Circle(F5_R_2, mode=Mode.SUBTRACT)
        with Locations((5.08, -6.35)):
            Circle(F5_R)
        with Locations((5.08, -6.35)):
            Circle(F5_R_2, mode=Mode.SUBTRACT)
        with Locations((-5.08, -6.35)):
            Circle(F5_R_2)
        with Locations((5.08, -6.35)):
            Circle(F5_R_2)
    extrude(amount=F9_DEPTH, mode=Mode.SUBTRACT)

    # F5 (on Right) → F10 (cut)
    with BuildSketch(Plane.YZ.offset(F10_START)):
        with Locations((-5.08, -6.35)):
            Circle(F5_R)
        with Locations((-5.08, -6.35)):
            Circle(F5_R_2, mode=Mode.SUBTRACT)
        with Locations((5.08, -6.35)):
            Circle(F5_R)
        with Locations((5.08, -6.35)):
            Circle(F5_R_2, mode=Mode.SUBTRACT)
        with Locations((-5.08, -6.35)):
            Circle(F5_R_2)
        with Locations((5.08, -6.35)):
            Circle(F5_R_2)
    extrude(amount=-F10_DEPTH, mode=Mode.SUBTRACT)

    # F6 (on Front) → F11 (cut)
    with BuildSketch(Plane.XZ.offset(F11_START)):
        with Locations((5.08, -6.35)):
            Circle(F6_R_2)
        with Locations((5.08, -6.35)):
            Circle(F6_R, mode=Mode.SUBTRACT)
        with Locations((5.08, -6.35)):
            Circle(F6_R)
    extrude(amount=-F11_DEPTH, mode=Mode.SUBTRACT)

    # F12
    f12_edges = [f1_1.edges().sort_by_distance(p)[0] for p in [
        (11.929616, -11.929616, 0),
        (-11.929616, -11.929616, 0),
        (-11.200968, 2.998063, 0),
        (11.200968, 2.998063, 0),
    ]]
    fillet(f12_edges, radius=F12_R)

    # F13
    f13_edges = [f1_1.edges().sort_by_distance(p)[0] for p in [
        (14.097, -17.78, 15.24),
        (-21.463, -17.78, 15.24),
        (-21.463, 17.78, 15.24),
        (14.097, 17.78, 15.24),
        (-7.493, 27.94, -6.35),
        (-25.4, -7.747, -6.35),
        (-25.4, 2.413, -6.35),
        (2.667, -27.94, -6.35),
        (-7.493, -27.94, -6.35),
        (25.4, -7.747, -6.35),
        (25.4, 2.413, -6.35),
        (13.97, -17.78, -12.7),
        (-21.59, -17.78, -12.7),
        (13.843, 17.78, -12.7),
        (-21.59, 17.78, -12.7),
        (2.413, 25.4, -6.35),
    ]]
    fillet(f13_edges, radius=F13_R)


solid = f1_1.part
